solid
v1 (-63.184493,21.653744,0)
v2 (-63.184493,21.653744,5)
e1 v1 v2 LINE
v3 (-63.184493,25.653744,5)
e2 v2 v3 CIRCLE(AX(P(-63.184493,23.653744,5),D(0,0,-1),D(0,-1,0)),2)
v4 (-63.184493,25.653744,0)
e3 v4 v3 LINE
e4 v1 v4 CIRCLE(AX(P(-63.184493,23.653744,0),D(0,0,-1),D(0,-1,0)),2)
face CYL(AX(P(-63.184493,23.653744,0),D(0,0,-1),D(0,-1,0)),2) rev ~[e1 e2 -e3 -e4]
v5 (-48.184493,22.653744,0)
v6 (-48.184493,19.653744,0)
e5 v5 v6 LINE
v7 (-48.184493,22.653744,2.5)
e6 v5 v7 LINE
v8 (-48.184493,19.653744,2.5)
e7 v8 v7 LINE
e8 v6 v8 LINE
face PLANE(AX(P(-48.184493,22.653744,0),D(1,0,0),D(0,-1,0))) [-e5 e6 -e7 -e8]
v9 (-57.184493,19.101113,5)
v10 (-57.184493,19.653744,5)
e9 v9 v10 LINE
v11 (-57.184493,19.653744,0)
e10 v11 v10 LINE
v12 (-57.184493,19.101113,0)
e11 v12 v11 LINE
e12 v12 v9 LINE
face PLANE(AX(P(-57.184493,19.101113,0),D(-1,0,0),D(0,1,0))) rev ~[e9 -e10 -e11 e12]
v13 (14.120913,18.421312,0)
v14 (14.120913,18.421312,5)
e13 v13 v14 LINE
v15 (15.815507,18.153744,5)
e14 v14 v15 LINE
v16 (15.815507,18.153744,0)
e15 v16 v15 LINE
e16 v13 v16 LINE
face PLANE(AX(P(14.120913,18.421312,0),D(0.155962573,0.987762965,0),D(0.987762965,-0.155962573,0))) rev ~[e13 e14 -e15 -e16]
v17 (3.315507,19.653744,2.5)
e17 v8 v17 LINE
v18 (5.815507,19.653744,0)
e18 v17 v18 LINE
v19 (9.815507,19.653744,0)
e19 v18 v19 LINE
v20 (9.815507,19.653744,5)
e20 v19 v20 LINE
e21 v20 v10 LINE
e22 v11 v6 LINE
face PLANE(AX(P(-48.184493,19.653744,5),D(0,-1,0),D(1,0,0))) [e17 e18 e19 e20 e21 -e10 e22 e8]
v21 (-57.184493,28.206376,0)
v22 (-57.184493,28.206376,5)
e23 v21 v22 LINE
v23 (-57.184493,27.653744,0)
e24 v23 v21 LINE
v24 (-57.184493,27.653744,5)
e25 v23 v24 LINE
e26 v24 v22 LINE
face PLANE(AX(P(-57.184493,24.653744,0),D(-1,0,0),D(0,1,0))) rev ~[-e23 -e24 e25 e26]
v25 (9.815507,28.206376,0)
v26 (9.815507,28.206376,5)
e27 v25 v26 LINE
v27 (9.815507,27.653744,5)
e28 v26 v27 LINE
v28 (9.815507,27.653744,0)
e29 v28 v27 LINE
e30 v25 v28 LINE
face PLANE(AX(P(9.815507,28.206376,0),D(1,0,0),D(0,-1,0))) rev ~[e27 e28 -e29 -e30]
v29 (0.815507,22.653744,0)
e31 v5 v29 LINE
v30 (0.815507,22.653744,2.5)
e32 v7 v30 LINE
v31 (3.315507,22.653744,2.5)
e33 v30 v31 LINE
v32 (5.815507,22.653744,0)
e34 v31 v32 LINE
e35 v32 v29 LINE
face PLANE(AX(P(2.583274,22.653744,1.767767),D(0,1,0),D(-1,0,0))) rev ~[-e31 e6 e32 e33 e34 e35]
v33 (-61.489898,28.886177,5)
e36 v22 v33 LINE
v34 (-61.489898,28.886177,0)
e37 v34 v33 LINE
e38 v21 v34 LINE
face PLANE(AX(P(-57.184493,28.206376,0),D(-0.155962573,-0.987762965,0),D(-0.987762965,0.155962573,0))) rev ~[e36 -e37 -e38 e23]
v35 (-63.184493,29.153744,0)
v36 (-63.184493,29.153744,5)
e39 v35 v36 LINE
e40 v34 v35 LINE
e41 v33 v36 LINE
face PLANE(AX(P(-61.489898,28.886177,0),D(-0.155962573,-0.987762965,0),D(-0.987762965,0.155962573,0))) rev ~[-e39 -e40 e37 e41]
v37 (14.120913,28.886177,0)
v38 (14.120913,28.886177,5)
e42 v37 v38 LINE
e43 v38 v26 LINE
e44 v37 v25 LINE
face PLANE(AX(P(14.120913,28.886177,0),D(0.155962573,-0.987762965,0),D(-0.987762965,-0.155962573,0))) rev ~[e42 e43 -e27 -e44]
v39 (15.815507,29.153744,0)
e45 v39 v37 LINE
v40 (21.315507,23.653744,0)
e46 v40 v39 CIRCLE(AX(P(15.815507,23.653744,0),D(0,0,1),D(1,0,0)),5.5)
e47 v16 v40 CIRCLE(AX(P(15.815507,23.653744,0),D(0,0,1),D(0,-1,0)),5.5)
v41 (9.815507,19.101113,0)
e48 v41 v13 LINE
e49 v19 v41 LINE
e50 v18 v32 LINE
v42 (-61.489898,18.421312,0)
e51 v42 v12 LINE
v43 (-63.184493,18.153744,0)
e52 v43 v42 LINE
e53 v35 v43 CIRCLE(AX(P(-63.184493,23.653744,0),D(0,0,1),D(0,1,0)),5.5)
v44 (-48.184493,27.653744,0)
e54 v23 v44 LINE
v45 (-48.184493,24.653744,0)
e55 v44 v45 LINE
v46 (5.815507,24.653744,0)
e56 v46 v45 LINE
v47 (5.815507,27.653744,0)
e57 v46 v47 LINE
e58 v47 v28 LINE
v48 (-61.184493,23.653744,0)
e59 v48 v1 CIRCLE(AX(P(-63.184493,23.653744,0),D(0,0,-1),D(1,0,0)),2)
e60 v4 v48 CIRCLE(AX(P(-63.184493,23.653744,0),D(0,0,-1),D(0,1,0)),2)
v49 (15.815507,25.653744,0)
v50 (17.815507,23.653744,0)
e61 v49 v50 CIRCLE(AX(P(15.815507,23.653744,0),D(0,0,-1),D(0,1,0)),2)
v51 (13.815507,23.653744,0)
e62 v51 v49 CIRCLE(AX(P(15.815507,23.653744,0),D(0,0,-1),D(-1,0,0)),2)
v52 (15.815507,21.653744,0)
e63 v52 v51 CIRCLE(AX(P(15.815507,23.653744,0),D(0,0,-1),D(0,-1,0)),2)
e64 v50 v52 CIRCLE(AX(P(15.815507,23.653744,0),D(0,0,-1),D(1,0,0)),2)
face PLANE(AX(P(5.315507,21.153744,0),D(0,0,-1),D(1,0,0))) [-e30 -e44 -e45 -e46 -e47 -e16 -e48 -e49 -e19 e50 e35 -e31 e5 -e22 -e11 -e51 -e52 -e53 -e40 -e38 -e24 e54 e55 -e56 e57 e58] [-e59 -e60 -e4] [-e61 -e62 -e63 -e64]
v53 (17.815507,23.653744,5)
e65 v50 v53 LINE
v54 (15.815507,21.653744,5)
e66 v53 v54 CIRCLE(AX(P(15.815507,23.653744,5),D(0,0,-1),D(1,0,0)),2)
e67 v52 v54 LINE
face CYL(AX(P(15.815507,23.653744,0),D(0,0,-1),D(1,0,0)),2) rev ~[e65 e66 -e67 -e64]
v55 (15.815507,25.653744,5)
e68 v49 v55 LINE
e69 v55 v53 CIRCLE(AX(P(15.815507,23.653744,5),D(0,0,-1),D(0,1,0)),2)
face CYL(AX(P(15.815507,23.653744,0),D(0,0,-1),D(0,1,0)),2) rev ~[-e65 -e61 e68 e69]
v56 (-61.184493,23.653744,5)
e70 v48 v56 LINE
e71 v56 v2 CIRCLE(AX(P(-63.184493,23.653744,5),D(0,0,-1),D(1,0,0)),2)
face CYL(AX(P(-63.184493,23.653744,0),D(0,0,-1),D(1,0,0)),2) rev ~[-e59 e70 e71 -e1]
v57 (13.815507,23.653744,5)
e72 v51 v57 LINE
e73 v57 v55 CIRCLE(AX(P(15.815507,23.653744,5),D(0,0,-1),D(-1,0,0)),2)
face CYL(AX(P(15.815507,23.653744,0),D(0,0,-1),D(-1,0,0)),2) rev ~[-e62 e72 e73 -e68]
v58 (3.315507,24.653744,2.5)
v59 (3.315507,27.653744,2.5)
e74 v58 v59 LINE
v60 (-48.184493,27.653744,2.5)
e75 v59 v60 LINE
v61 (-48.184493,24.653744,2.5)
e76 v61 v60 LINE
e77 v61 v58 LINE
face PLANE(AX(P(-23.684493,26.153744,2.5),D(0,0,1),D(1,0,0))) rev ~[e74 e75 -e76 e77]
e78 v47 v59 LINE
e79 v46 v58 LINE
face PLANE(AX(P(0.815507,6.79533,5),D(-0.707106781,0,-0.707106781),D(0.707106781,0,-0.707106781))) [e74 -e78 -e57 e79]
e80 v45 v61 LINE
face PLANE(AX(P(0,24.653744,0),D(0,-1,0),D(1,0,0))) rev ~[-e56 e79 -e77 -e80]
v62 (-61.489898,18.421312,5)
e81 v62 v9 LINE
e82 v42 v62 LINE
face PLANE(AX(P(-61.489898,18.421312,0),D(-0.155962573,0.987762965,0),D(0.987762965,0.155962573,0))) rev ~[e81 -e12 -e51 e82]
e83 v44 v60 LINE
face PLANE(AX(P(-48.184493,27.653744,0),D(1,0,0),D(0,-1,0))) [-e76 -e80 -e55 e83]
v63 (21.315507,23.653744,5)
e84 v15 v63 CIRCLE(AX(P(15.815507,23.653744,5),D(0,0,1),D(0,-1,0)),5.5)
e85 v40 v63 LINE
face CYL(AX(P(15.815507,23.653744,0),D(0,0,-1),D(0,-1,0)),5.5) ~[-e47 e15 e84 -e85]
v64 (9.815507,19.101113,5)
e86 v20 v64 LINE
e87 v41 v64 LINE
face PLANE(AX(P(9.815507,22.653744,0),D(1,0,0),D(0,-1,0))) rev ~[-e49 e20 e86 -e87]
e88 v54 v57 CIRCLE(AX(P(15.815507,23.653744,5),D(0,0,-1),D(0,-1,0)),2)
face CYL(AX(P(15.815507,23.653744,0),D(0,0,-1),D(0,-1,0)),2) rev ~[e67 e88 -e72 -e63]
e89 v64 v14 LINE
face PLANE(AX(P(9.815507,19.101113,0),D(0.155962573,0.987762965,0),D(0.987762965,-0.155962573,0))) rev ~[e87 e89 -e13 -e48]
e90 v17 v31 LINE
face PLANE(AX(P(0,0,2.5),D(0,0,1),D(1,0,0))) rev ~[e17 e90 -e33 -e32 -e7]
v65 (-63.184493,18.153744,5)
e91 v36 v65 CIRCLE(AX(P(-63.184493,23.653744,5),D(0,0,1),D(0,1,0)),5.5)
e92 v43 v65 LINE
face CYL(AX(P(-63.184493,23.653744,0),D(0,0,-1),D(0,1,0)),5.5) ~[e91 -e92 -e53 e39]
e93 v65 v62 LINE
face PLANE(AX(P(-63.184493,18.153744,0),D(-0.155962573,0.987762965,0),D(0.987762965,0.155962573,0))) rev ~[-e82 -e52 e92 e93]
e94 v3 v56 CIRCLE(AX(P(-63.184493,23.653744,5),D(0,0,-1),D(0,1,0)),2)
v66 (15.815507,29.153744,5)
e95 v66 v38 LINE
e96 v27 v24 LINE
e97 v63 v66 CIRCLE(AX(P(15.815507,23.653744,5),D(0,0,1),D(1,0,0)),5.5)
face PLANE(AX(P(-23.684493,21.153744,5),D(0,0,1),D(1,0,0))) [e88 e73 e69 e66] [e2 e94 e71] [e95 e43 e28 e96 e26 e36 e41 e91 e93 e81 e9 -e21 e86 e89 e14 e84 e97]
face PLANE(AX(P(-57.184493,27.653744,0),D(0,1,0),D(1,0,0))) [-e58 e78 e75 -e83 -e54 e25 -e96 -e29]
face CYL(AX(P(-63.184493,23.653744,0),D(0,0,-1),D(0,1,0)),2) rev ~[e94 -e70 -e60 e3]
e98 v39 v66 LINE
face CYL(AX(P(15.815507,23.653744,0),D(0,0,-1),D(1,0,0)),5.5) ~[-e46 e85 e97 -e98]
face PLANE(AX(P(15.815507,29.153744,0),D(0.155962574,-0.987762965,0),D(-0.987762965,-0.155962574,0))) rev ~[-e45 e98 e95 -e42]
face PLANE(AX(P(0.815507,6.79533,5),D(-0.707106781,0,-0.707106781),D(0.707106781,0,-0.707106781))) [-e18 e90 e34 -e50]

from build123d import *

# Parameters (mm, degrees)
F0_W         = 60
F0_H         = 2
F1_DEPTH     = 5
F2_W         = 9
F2_H         = 3
F3_DEPTH     = 5
F4_W         = 49
F4_H         = 3
F5_DEPTH     = 2.5
F6_T4_DEPTH  = 15.8584149398
F6_T9_DEPTH  = 28.7168298797
F6_T15_DEPTH = 28.7168298797
F6_T21_DEPTH = 15.8584149398


# Not quite as in the source:
# - a fillet or chamfer that OpenCascade refuses, or shapes differently, is made with other operations: its cross-section is extruded or revolved along the edge and cut away or added


with BuildPart() as f1:
    # F0 (on Top) → F1 (new body)
    with BuildSketch(Plane.XY):
        with BuildLine():
            ThreePointArc((21.3155073225, 23.6537444443), (19.7045946191, 27.5428317408), (15.8155073225, 29.1537444443))
            Line((15.8155073225, 29.1537444443), (15.8155073225, 25.6537444443))
            ThreePointArc((15.8155073225, 25.6537444443), (17.2297208849, 25.0679580066), (17.8155073225, 23.6537444443))
            ThreePointArc((17.8155073225, 23.6537444443), (17.2297208849, 22.2395308819), (15.8155073225, 21.6537444443))
            Line((15.8155073225, 21.6537444443), (15.8155073225, 18.1537444443))
            ThreePointArc((15.8155073225, 18.1537444443), (19.7045946191, 19.7646571477), (21.3155073225, 23.6537444443))
        make_face()
        with BuildLine():
            Line((15.8155073225, 29.1537444443), (14.120912728, 28.8861768767))
            ThreePointArc((14.120912728, 28.8861768767), (11.3674588589, 26.8886887815), (10.3155073225, 23.6537444443))
            Line((10.3155073225, 23.6537444443), (13.8155073225, 23.6537444443))
            ThreePointArc((13.8155073225, 23.6537444443), (14.4012937602, 25.0679580066), (15.8155073225, 25.6537444443))
            Line((15.8155073225, 25.6537444443), (15.8155073225, 29.1537444443))
        make_face()
        with BuildLine():
            Line((13.8155073225, 23.6537444443), (10.3155073225, 23.6537444443))
            ThreePointArc((10.3155073225, 23.6537444443), (11.3674588589, 20.418800107), (14.120912728, 18.4213120118))
            Line((14.120912728, 18.4213120118), (15.8155073225, 18.1537444443))
            Line((15.8155073225, 18.1537444443), (15.8155073225, 21.6537444443))
            ThreePointArc((15.8155073225, 21.6537444443), (14.4012937602, 22.2395308819), (13.8155073225, 23.6537444443))
        make_face()
        with BuildLine():
            Line((14.120912728, 28.8861768767), (9.8155073225, 28.2063760232))
            Line((9.8155073225, 28.2063760232), (9.8155073225, 24.6537444443))
            Line((9.8155073225, 24.6537444443), (9.8155073225, 23.6537444443))
            Line((9.8155073225, 23.6537444443), (10.3155073225, 23.6537444443))
            ThreePointArc((10.3155073225, 23.6537444443), (11.3674588589, 26.8886887815), (14.120912728, 28.8861768767))
        make_face()
        with BuildLine():
            Line((10.3155073225, 23.6537444443), (9.8155073225, 23.6537444443))
            Line((9.8155073225, 23.6537444443), (9.8155073225, 22.6537444443))
            Line((9.8155073225, 22.6537444443), (9.8155073225, 19.1011128653))
            Line((9.8155073225, 19.1011128653), (14.120912728, 18.4213120118))
            ThreePointArc((14.120912728, 18.4213120118), (11.3674588589, 20.418800107), (10.3155073225, 23.6537444443))
        make_face()
        with Locations((-23.6844926775, 23.6537444443)):
            Rectangle(F0_W, F0_H)
        Polygon((9.8155073225, 24.6537444443), (6.3155073225, 24.6537444443), (6.3155073225, 22.6537444443), (9.8155073225, 22.6537444443), (9.8155073225, 23.6537444443), align=None)
        with BuildLine():
            ThreePointArc((-57.6844926775, 23.6537444443), (-58.7364442138, 26.8886887815), (-61.4898980829, 28.8861768767))
            Line((-61.4898980829, 28.8861768767), (-63.1844926775, 29.1537444443))
            Line((-63.1844926775, 29.1537444443), (-63.1844926775, 25.6537444443))
            ThreePointArc((-63.1844926775, 25.6537444443), (-61.7702791151, 25.0679580066), (-61.1844926775, 23.6537444443))
            Line((-61.1844926775, 23.6537444443), (-57.6844926775, 23.6537444443))
        make_face()
        with BuildLine():
            ThreePointArc((-61.4898980829, 18.4213120118), (-58.7364442138, 20.418800107), (-57.6844926775, 23.6537444443))
            Line((-57.6844926775, 23.6537444443), (-61.1844926775, 23.6537444443))
            ThreePointArc((-61.1844926775, 23.6537444443), (-61.7702791151, 22.2395308819), (-63.1844926775, 21.6537444443))
            Line((-63.1844926775, 21.6537444443), (-63.1844926775, 18.1537444443))
            Line((-63.1844926775, 18.1537444443), (-61.4898980829, 18.4213120118))
        make_face()
        with BuildLine():
            Line((-63.1844926775, 25.6537444443), (-63.1844926775, 29.1537444443))
            ThreePointArc((-63.1844926775, 29.1537444443), (-68.6844926775, 23.6537444443), (-63.1844926775, 18.1537444443))
            Line((-63.1844926775, 18.1537444443), (-63.1844926775, 21.6537444443))
            ThreePointArc((-63.1844926775, 21.6537444443), (-65.1844926775, 23.6537444443), (-63.1844926775, 25.6537444443))
        make_face()
        with BuildLine():
            Line((-57.1844926775, 24.6537444443), (-57.1844926775, 28.2063760232))
            Line((-57.1844926775, 28.2063760232), (-61.4898980829, 28.8861768767))
            ThreePointArc((-61.4898980829, 28.8861768767), (-58.7364442138, 26.8886887815), (-57.6844926775, 23.6537444443))
            Line((-57.6844926775, 23.6537444443), (-57.1844926775, 23.6537444443))
            Line((-57.1844926775, 23.6537444443), (-57.1844926775, 24.6537444443))
        make_face()
        with BuildLine():
            Line((-57.1844926775, 22.6537444443), (-57.1844926775, 23.6537444443))
            Line((-57.1844926775, 23.6537444443), (-57.6844926775, 23.6537444443))
            ThreePointArc((-57.6844926775, 23.6537444443), (-58.7364442138, 20.418800107), (-61.4898980829, 18.4213120118))
            Line((-61.4898980829, 18.4213120118), (-57.1844926775, 19.1011128653))
            Line((-57.1844926775, 19.1011128653), (-57.1844926775, 22.6537444443))
        make_face()
        Polygon((-53.6844926775, 22.6537444443), (-53.6844926775, 24.6537444443), (-57.1844926775, 24.6537444443), (-57.1844926775, 23.6537444443), (-57.1844926775, 22.6537444443), align=None)
    extrude(amount=F1_DEPTH)

    # F2 (on face) → F3 (join)
    with BuildSketch(Plane(origin=(0, 0, 0), x_dir=(1, 0, 0), z_dir=(0, 0, -1))):
        with Locations((5.3155073225, -21.1537444443)):
            Rectangle(F2_W, F2_H)
        with Locations((5.3155073225, -26.1537444443)):
            Rectangle(F2_W, F2_H)
        with Locations((-52.6844926775, -21.1537444443)):
            Rectangle(F2_W, F2_H)
        with Locations((-52.6844926775, -26.1537444443)):
            Rectangle(F2_W, F2_H)
    extrude(amount=-F3_DEPTH)

    # F4 (on face) → F5 (join)
    with BuildSketch(Plane.XY.offset(5)):
        with Locations((-23.6844926775, 21.1537444443)):
            Rectangle(F4_W, F4_H)
        with Locations((-23.6844926775, 26.1537444443)):
            Rectangle(F4_W, F4_H)
    extrude(amount=-F5_DEPTH)

    # F6: chamfer of 5 on 2 edges, made by hand


with BuildPart() as f6_tool2:
    # F6_s3 → F6_t4 (new body)
    with BuildSketch(Plane.XZ.offset(-6.7953295044)):
        Polygon((0.8155073225, 5), (5.8155073225, 0), (0.8155073225, 0), align=None)
    extrude(amount=-F6_T4_DEPTH)

    split(bisect_by=Plane.XY.offset(2.5), keep=Keep.BOTTOM)


with BuildPart() as f1_1:
    add(f1.part)

    # F6_t1: cut F6_tool2
    add(f6_tool2.part, mode=Mode.SUBTRACT)


with BuildPart() as f6_tool7:
    # F6_s8 → F6_t9 (new body)
    with BuildSketch(Plane.XZ.offset(-6.7953295044)):
        Polygon((0.8155073225, 5), (5.8155073225, 0), (0.8155073225, 0), align=None)
    extrude(amount=-F6_T9_DEPTH)

    split(bisect_by=Plane.XY.offset(2.5), keep=Keep.BOTTOM)

    split(bisect_by=Plane.XZ.offset(-24.6537444443), keep=Keep.BOTTOM)


with BuildPart() as f1_2:
    add(f1_1.part)

    # F6_t6: cut F6_tool7
    add(f6_tool7.part, mode=Mode.SUBTRACT)


with BuildPart() as f6_tool13:
    # F6_s14 → F6_t15 (new body)
    with BuildSketch(Plane.XZ.offset(-11.7953295044)):
        Polygon((0.8155073225, 5), (5.8155073225, 0), (0.8155073225, 0), align=None)
    extrude(amount=-F6_T15_DEPTH)

    split(bisect_by=Plane.XZ.offset(-22.6537444443), keep=Keep.TOP)

    split(bisect_by=Plane.XY.offset(2.5), keep=Keep.BOTTOM)


with BuildPart() as f1_3:
    add(f1_2.part)

    # F6_t12: cut F6_tool13
    add(f6_tool13.part, mode=Mode.SUBTRACT)


with BuildPart() as f6_tool19:
    # F6_s20 → F6_t21 (new body)
    with BuildSketch(Plane.XZ.offset(-24.6537444443)):
        Polygon((0.8155073225, 5), (5.8155073225, 0), (0.8155073225, 0), align=None)
    extrude(amount=-F6_T21_DEPTH)

    split(bisect_by=Plane.XY.offset(2.5), keep=Keep.BOTTOM)


with BuildPart() as f1_4:
    add(f1_3.part)

    # F6_t18: cut F6_tool19
    add(f6_tool19.part, mode=Mode.SUBTRACT)


solid = f1_4.part
